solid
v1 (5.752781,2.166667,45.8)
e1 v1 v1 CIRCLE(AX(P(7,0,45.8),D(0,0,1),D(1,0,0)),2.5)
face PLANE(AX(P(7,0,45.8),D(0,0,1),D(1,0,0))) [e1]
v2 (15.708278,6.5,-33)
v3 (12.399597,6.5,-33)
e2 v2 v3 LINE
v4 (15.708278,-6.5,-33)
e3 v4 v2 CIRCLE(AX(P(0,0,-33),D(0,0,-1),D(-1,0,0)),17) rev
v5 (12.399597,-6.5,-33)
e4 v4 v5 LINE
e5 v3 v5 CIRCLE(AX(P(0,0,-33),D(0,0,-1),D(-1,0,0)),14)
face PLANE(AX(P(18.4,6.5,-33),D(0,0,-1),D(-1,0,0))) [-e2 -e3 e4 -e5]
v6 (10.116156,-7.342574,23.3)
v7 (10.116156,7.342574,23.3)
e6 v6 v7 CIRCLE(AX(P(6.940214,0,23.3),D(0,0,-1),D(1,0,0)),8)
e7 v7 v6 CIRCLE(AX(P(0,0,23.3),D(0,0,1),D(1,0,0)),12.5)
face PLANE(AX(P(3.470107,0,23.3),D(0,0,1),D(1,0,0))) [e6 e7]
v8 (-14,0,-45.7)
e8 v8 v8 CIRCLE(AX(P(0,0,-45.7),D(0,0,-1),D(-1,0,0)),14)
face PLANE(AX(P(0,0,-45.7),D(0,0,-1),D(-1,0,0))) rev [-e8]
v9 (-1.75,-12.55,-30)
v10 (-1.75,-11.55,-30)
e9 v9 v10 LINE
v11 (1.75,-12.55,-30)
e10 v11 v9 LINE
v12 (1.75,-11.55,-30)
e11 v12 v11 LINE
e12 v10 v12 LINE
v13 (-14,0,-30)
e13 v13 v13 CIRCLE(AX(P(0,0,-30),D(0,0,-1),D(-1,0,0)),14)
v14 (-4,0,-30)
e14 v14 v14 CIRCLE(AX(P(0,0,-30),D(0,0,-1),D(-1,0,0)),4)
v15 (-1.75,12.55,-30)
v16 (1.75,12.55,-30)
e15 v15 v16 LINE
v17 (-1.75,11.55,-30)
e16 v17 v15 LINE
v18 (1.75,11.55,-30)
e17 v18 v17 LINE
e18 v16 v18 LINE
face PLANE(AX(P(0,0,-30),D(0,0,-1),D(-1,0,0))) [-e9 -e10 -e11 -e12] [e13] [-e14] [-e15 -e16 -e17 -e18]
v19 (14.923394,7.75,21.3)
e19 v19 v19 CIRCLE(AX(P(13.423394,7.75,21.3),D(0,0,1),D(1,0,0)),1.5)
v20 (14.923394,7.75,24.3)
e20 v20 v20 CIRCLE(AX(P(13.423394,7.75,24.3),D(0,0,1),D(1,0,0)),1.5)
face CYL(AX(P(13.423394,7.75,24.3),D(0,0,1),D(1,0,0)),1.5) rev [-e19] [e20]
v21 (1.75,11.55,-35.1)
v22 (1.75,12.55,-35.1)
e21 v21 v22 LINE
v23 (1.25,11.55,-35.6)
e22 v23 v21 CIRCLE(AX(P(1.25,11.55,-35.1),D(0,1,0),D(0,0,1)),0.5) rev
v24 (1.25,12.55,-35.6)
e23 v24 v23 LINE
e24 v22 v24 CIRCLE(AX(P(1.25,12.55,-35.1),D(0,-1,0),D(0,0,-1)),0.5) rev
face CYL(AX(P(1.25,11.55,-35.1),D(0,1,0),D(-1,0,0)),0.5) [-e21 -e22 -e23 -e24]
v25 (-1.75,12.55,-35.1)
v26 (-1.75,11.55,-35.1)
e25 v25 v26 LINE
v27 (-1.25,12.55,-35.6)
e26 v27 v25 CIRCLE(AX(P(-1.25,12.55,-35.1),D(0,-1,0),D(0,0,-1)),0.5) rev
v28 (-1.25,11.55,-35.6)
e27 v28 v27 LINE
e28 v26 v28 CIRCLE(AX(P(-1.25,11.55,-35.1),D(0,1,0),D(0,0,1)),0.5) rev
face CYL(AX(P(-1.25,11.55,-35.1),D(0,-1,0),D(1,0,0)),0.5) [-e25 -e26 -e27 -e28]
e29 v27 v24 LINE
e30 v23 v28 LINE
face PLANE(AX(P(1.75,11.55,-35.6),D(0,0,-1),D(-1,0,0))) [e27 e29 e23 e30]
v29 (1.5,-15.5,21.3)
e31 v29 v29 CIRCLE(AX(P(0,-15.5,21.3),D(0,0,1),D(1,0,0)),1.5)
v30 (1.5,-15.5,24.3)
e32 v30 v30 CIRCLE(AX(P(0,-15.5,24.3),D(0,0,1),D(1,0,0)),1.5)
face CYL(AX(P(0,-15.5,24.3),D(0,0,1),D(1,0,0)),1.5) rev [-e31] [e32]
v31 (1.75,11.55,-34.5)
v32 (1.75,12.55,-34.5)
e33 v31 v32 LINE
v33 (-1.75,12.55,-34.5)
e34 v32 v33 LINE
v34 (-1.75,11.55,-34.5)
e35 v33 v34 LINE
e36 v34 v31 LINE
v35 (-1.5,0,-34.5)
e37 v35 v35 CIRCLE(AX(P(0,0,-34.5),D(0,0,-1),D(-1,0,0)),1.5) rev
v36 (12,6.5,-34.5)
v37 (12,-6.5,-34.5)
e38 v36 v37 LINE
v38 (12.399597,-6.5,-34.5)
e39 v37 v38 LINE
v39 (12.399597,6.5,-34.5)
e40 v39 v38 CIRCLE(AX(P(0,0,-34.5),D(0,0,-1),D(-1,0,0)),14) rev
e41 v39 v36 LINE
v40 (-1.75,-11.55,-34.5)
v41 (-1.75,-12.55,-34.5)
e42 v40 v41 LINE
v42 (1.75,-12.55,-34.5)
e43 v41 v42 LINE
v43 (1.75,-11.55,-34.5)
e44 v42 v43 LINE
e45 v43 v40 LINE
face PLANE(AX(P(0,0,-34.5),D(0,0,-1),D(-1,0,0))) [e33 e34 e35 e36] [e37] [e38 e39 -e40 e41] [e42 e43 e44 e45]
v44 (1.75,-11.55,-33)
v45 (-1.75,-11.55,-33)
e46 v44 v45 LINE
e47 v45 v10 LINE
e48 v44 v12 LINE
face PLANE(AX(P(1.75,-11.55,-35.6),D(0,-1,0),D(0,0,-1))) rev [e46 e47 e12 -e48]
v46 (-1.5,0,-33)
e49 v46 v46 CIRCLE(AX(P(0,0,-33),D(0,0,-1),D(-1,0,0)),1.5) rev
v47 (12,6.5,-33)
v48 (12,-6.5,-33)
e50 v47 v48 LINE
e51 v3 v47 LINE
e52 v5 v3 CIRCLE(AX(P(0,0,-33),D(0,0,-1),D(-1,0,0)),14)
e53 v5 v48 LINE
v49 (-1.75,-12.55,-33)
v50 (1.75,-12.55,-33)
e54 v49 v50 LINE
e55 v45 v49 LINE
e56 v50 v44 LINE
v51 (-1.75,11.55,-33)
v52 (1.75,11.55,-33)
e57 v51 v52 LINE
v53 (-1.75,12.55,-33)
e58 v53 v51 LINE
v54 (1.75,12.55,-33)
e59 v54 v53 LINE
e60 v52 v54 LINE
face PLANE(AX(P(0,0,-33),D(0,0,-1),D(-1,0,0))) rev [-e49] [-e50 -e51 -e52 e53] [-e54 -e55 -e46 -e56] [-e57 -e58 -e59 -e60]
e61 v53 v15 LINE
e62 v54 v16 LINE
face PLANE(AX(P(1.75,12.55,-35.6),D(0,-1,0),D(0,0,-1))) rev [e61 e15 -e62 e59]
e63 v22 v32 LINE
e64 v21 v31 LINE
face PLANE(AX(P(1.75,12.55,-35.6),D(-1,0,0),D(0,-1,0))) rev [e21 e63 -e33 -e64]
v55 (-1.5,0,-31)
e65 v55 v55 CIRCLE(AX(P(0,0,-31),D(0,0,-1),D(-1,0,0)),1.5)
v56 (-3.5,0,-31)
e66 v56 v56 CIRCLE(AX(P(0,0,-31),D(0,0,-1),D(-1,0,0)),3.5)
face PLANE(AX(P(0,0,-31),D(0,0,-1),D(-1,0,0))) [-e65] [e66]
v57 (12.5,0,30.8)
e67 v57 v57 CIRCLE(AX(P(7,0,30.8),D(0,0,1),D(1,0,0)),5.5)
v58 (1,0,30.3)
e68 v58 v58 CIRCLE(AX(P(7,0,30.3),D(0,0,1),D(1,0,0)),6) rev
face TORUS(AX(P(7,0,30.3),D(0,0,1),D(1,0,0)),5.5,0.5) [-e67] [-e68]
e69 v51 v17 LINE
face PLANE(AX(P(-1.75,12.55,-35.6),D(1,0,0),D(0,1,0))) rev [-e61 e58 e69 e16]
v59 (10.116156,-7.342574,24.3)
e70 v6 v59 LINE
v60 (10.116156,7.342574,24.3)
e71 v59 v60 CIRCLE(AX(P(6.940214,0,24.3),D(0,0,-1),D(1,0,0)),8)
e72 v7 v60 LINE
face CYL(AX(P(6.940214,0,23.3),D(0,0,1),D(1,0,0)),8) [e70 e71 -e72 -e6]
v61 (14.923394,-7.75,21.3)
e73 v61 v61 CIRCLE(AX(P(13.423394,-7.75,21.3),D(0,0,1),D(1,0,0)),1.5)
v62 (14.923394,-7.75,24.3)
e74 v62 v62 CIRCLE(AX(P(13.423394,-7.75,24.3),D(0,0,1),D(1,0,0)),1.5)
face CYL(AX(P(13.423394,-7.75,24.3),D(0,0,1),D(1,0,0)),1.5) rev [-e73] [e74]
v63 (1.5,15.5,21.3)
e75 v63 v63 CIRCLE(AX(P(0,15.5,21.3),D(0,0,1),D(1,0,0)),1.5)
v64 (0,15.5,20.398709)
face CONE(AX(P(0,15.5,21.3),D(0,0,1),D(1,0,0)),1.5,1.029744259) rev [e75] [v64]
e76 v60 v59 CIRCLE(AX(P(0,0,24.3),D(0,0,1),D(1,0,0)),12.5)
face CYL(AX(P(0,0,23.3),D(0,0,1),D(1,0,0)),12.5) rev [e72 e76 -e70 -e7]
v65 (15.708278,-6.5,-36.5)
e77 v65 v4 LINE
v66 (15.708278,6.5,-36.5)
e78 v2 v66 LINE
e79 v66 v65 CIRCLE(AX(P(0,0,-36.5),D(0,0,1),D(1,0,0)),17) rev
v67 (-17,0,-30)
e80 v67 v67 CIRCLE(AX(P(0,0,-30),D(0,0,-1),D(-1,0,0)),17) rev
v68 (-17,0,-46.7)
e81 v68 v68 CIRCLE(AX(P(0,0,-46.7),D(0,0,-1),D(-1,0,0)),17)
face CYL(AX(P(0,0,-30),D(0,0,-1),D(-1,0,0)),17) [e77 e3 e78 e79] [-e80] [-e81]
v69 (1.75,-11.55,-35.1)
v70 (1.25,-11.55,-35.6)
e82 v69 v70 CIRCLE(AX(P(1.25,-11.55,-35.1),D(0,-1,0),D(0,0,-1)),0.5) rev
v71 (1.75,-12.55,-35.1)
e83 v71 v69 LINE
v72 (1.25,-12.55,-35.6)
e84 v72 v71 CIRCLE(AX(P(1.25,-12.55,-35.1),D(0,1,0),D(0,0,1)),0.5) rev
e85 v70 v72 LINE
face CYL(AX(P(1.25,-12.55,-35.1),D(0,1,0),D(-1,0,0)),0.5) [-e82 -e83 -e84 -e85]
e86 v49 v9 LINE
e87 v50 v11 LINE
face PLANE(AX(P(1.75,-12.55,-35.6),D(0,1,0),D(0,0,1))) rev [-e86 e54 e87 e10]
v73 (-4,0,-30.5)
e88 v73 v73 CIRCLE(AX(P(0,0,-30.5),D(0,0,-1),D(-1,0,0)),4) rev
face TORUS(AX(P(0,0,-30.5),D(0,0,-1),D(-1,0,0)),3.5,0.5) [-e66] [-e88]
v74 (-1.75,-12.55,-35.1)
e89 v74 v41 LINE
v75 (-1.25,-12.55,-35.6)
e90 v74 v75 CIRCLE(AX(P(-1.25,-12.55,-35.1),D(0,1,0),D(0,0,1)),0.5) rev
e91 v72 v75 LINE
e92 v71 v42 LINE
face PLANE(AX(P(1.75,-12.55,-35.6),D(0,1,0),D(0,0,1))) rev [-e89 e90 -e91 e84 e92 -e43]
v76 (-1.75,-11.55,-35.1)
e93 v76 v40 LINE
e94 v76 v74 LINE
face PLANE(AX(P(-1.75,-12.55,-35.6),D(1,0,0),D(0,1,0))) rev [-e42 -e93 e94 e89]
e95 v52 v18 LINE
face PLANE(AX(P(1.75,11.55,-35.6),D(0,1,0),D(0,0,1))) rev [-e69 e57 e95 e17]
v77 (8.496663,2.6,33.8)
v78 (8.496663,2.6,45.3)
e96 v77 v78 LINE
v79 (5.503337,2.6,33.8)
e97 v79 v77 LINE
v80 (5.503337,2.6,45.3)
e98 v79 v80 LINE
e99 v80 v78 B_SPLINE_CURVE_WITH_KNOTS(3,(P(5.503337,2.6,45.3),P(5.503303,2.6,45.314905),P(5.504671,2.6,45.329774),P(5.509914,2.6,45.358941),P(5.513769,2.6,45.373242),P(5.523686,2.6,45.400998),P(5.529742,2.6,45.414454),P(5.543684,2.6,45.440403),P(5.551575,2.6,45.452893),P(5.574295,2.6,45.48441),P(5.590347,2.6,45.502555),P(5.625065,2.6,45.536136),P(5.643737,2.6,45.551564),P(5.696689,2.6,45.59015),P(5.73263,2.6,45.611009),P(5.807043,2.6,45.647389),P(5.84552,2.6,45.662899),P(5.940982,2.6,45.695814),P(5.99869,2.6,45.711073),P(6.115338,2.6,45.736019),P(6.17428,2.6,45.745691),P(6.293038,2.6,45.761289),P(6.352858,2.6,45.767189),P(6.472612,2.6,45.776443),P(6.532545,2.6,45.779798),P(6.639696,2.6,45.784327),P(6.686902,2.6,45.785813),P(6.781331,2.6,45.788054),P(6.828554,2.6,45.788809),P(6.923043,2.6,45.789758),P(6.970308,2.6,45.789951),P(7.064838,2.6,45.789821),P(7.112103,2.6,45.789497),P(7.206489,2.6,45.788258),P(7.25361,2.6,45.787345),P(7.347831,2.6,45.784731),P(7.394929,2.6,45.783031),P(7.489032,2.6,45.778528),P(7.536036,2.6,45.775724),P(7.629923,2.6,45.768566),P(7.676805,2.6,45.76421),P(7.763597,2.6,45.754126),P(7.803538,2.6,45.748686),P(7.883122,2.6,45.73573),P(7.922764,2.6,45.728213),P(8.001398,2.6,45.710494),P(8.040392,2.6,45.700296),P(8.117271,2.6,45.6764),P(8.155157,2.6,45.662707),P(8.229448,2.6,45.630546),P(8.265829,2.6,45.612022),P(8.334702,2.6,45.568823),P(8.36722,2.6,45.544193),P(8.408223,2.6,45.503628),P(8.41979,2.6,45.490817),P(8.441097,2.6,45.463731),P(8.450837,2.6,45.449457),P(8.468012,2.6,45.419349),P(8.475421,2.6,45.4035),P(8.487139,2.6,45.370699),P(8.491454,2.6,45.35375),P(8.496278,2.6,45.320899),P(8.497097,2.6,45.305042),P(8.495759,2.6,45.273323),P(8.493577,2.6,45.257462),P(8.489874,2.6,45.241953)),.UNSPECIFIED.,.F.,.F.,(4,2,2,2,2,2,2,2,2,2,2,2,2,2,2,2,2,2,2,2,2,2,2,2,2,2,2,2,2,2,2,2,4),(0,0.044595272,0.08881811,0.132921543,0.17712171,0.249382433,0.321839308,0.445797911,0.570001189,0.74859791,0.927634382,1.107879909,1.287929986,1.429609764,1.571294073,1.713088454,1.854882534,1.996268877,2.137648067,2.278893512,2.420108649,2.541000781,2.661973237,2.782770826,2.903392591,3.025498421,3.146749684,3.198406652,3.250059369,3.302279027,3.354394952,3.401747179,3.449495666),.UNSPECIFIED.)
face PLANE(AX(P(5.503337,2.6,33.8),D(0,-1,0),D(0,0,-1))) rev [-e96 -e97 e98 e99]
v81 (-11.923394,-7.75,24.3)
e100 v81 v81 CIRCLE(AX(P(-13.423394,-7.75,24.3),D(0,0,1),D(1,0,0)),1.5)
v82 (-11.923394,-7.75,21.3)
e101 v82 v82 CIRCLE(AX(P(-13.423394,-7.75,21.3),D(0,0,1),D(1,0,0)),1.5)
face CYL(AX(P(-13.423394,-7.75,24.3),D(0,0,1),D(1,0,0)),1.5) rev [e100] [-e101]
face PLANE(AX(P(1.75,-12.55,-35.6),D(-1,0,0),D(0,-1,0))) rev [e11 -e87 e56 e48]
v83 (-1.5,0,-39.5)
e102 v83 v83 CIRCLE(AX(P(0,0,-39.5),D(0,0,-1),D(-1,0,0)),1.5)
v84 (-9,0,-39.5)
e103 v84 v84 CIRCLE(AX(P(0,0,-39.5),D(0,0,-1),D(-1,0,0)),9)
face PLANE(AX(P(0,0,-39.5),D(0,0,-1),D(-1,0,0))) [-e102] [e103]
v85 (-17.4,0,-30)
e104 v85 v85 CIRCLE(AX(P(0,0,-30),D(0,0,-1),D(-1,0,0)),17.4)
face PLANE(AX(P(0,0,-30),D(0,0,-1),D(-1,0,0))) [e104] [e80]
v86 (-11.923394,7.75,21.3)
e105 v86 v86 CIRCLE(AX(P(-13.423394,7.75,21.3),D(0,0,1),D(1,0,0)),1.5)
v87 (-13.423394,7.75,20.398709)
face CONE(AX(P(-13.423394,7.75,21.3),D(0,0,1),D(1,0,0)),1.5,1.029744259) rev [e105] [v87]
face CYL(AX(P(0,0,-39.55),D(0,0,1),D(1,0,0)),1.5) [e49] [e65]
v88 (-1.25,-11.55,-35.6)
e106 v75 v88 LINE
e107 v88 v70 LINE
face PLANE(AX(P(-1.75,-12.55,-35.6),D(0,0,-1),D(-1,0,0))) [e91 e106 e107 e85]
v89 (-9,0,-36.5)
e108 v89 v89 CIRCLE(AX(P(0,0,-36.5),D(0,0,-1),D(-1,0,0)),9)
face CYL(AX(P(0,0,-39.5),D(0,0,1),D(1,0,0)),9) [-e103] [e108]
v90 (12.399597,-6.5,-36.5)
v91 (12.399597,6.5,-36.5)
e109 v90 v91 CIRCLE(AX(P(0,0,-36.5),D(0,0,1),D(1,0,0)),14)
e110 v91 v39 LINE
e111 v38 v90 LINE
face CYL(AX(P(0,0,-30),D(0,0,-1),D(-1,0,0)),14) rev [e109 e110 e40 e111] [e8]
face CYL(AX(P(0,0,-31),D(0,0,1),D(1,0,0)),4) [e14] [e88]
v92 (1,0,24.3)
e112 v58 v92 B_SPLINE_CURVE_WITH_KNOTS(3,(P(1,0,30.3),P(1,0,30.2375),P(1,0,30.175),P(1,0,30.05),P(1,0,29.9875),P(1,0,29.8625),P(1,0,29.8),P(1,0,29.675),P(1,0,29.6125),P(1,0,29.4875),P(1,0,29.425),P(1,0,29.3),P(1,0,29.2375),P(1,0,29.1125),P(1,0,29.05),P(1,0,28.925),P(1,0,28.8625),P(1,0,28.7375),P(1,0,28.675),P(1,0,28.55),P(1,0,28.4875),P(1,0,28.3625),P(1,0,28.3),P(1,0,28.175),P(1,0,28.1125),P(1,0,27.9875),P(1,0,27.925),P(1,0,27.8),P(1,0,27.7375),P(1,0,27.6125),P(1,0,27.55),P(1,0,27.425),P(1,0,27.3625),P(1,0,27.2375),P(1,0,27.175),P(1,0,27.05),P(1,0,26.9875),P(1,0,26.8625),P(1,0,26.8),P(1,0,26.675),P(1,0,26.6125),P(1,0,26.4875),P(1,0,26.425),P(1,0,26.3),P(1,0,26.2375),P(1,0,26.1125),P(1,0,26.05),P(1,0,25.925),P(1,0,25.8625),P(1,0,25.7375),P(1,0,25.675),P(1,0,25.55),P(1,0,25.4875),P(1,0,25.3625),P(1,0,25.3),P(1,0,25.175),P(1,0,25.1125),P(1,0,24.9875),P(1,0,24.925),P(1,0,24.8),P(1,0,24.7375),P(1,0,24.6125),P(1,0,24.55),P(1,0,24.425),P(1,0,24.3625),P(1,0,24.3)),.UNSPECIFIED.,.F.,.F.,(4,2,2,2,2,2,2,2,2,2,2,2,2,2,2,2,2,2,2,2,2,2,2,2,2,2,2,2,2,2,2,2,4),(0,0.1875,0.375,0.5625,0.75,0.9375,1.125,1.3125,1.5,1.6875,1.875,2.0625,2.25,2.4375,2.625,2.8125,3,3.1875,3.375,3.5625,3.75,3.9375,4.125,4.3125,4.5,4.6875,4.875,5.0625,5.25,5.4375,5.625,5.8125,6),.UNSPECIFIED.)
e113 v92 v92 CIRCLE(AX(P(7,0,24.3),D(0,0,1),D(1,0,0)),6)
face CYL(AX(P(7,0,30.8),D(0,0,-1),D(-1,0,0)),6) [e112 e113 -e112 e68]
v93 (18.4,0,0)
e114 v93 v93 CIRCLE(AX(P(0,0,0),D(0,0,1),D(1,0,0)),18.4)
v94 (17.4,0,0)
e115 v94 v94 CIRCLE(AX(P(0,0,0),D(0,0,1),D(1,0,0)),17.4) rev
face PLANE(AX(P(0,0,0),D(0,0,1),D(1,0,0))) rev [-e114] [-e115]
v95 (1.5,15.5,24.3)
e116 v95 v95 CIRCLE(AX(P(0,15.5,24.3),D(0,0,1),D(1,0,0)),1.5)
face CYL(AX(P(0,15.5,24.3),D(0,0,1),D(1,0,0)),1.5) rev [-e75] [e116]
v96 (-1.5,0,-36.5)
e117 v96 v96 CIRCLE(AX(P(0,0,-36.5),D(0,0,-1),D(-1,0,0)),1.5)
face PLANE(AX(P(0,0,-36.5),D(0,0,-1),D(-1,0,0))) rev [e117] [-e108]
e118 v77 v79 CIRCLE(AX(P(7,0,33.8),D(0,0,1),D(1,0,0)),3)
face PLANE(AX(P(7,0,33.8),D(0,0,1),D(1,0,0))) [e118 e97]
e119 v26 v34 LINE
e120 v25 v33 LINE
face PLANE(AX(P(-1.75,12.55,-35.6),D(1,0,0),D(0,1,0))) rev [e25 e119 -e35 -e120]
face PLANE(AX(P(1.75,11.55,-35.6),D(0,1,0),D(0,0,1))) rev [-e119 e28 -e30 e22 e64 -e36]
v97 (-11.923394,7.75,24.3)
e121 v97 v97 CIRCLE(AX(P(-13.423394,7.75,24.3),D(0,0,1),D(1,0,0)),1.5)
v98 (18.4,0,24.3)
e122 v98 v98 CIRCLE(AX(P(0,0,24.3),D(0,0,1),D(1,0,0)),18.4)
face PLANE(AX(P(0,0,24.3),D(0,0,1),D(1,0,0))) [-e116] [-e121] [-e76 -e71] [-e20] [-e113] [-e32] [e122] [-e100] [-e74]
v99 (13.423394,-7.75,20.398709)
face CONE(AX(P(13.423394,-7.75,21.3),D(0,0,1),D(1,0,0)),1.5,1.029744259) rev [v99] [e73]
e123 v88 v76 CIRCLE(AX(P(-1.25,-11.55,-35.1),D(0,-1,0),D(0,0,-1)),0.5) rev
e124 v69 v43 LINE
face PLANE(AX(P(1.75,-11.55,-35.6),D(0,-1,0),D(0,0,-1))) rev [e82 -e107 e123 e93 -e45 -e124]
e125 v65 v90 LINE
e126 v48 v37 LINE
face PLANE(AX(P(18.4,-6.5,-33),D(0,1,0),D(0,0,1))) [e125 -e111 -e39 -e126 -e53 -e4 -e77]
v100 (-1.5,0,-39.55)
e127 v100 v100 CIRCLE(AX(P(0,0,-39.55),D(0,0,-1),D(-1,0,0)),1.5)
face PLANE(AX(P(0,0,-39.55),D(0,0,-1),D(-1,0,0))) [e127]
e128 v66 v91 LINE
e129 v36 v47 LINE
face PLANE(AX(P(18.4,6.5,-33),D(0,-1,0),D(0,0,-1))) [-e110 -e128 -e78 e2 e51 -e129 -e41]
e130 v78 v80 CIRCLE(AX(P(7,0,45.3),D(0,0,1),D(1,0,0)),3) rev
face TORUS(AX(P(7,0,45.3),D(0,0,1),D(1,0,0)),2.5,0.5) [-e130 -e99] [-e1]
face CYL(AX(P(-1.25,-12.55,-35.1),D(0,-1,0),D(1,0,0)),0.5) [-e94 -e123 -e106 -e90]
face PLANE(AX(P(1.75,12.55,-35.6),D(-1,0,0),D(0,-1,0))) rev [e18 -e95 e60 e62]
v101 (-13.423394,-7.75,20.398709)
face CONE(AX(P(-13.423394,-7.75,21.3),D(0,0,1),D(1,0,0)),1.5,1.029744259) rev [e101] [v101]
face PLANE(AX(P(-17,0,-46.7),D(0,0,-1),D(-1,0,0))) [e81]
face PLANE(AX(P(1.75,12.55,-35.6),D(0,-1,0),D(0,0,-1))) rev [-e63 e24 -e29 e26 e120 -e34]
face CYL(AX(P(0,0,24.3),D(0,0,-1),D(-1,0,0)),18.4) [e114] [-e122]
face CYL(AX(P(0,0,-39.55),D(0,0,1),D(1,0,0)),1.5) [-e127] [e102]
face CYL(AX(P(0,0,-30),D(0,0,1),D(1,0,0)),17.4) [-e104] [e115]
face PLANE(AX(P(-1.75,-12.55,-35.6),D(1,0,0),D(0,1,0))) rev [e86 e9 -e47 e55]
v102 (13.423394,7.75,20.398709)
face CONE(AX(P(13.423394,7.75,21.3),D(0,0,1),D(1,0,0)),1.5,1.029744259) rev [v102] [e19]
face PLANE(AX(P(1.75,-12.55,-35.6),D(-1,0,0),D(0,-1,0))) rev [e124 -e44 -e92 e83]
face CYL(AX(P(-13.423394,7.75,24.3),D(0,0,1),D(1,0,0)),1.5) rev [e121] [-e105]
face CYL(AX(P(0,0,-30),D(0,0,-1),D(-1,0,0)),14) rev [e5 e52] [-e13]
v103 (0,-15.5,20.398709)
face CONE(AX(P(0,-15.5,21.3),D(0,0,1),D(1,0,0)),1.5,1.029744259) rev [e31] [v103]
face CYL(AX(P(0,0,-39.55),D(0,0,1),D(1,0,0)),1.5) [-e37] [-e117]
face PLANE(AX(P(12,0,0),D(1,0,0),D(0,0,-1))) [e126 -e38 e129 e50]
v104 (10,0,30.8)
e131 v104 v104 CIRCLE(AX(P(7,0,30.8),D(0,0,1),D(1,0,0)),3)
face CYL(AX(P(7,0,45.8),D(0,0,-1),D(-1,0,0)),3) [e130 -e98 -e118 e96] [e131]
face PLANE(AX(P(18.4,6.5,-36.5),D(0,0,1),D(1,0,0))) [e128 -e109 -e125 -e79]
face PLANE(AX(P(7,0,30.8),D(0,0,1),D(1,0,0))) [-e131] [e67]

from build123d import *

# Parameters (mm, degrees)
SKETCH1_R                    = 18.4
BOSS_EXTRUDE1_DEPTH          = 24.3
SKETCH2_R                    = 17.4
BOSS_EXTRUDE2_DEPTH          = 30
SKETCH3_R                    = 6
BOSS_EXTRUDE3_DEPTH          = 6.5
FILLET1_R                    = 0.5
SKETCH4_R                    = 3
BOSS_EXTRUDE4_DEPTH          = 15
CUT_EXTRUDE1_START           = -12
CUT_EXTRUDE1_DEPTH           = 12
F_3_0_3_DIAMETER_HOLE1_D     = 3
F_3_0_3_DIAMETER_HOLE1_DEPTH = 3
F_3_0_3_DIAMETER_HOLE1_TIP   = 0.901290929
CUT_EXTRUDE2_DEPTH           = 1
SKETCH9_R                    = 4
BOSS_EXTRUDE5_DEPTH          = 1
FILLET2_R                    = 0.5
SKETCH10_R                   = 14
BOSS_EXTRUDE6_DEPTH          = 1.5
SKETCH11_W                   = 3.5
SKETCH11_H                   = 1
BOSS_EXTRUDE7_DEPTH          = 5.6
FILLET3_R                    = 0.5
SKETCH13_R                   = 9
BOSS_EXTRUDE8_DEPTH          = 3
SKETCH14_R                   = 1.5
BOSS_EXTRUDE9_DEPTH          = 8.55
FILLET4_R                    = 0.5
SKETCH15_W                   = 3
SKETCH15_H                   = 16.7
SKETCH16_R                   = 14
BOSS_EXTRUDE10_DEPTH         = 1
CUT_EXTRUDE3_START           = 12
SKETCH17_W                   = 3.5
SKETCH17_H                   = 13
CUT_EXTRUDE3_DEPTH           = 42.460359146


with BuildPart() as part:
    # Sketch1 → Boss-Extrude1 (new body)
    with BuildSketch(Plane.XY):
        Circle(SKETCH1_R)
    extrude(amount=BOSS_EXTRUDE1_DEPTH)

    # Sketch2 → Boss-Extrude2 (add)
    with BuildSketch(Plane(origin=(0, 0, 0), x_dir=(-1, 0, 0), z_dir=(0, 0, -1))):
        with Locations(Location((0, 0, 0), (0, 0, 180))):
            Circle(SKETCH2_R)
    extrude(amount=BOSS_EXTRUDE2_DEPTH)

    # Sketch3 → Boss-Extrude3 (add)
    with BuildSketch(Plane.XY.offset(24.3)):
        with Locations(Location((7, 0, 0), (0, 0, 180))):
            Circle(SKETCH3_R)
    extrude(amount=BOSS_EXTRUDE3_DEPTH)

    # Fillet1
    fillet1_edges = [part.edges().sort_by_distance(p)[0] for p in [
        (13, 0, 30.8),
    ]]
    fillet(fillet1_edges, radius=FILLET1_R)

    # Sketch4 → Boss-Extrude4 (add)
    with BuildSketch(Plane.XY.offset(30.8)):
        with Locations((7, 0)):
            Circle(SKETCH4_R)
    extrude(amount=BOSS_EXTRUDE4_DEPTH)

    # Sketch5 → Cut-Extrude1 (cut)
    with BuildSketch(Plane.XY.offset(45.8).offset(CUT_EXTRUDE1_START)):
        with BuildLine():
            Line((5.503337045, 2.6), (8.496662955, 2.6))
            ThreePointArc((8.496662955, 2.6), (7, 3), (5.503337045, 2.6))
        make_face()
    extrude(amount=CUT_EXTRUDE1_DEPTH, mode=Mode.SUBTRACT)

    # Ø3.0 (3) Diameter Hole1
    with Locations(Plane.XY.offset(24.3)):
        with Locations((-13.423393759, 7.75), (-13.423393759, -7.75), (0, -15.5), (13.423393759, 7.75), (0, 15.5), (13.423393759, -7.75)):
            Hole(F_3_0_3_DIAMETER_HOLE1_D / 2, depth=F_3_0_3_DIAMETER_HOLE1_DEPTH)
            with Locations((0, 0, -(F_3_0_3_DIAMETER_HOLE1_DEPTH + F_3_0_3_DIAMETER_HOLE1_TIP / 2))):  # 118° drill point
                Cone(0, F_3_0_3_DIAMETER_HOLE1_D / 2, F_3_0_3_DIAMETER_HOLE1_TIP, mode=Mode.SUBTRACT)

    # Sketch8 → Cut-Extrude2 (cut)
    with BuildSketch(Plane.XY.offset(24.3)):
        with BuildLine():
            ThreePointArc((10.116155685, 7.342574083), (-12.5, 0), (10.116155685, -7.342574083))
            ThreePointArc((10.116155685, -7.342574083), (-1.05978604, 0), (10.116155685, 7.342574083))
        make_face()
    extrude(amount=-CUT_EXTRUDE2_DEPTH, mode=Mode.SUBTRACT)

    # Sketch9 → Boss-Extrude5 (add)
    with BuildSketch(Plane(origin=(0, 0, -30), x_dir=(-1, 0, 0), z_dir=(0, 0, -1))):
        Circle(SKETCH9_R)
    extrude(amount=BOSS_EXTRUDE5_DEPTH)

    # Fillet2
    fillet2_edges = [part.edges().sort_by_distance(p)[0] for p in [
        (4, 0, -31),
    ]]
    fillet(fillet2_edges, radius=FILLET2_R)

    # Sketch11 → Boss-Extrude7 (add)
    with BuildSketch(Plane(origin=(0, 0, -30), x_dir=(-1, 0, 0), z_dir=(0, 0, -1))):
        with Locations((0, 12.05)):
            Rectangle(SKETCH11_W, SKETCH11_H)
        with Locations((0, -12.05)):
            Rectangle(SKETCH11_W, SKETCH11_H)
    extrude(amount=BOSS_EXTRUDE7_DEPTH)

    # Fillet3
    fillet3_edges = [part.edges().sort_by_distance(p)[0] for p in [
        (1.75, 12.05, -35.6),
        (-1.75, 12.05, -35.6),
        (-1.75, -12.05, -35.6),
        (1.75, -12.05, -35.6),
    ]]
    fillet(fillet3_edges, radius=FILLET3_R)

    # Sketch14 → Boss-Extrude9 (add)
    with BuildSketch(Plane(origin=(0, 0, -31), x_dir=(-1, 0, 0), z_dir=(0, 0, -1))):
        Circle(SKETCH14_R)
    extrude(amount=BOSS_EXTRUDE9_DEPTH)

    # Fillet4
    # the kernel refuses this fillet: 0.5 mm, written as the material it takes off along each edge
    with BuildSketch(Plane(origin=(7, 0, 45.8), x_dir=(0.4622655728594592, 0.8867415295050277, 0), z_dir=(0.8867415295050277, -0.4622655728594592, 0))) as fillet4_piece_1:
        with BuildLine():
            CenterArc((3 - FILLET4_R, -FILLET4_R), FILLET4_R, 0, 90)
            Line((3 - FILLET4_R, 0), (3 - FILLET4_R, FILLET4_R * 0.02))
            Line((3 - FILLET4_R, FILLET4_R * 0.02), (3 + FILLET4_R * 0.02, FILLET4_R * 0.02))
            Line((3 + FILLET4_R * 0.02, FILLET4_R * 0.02), (3 + FILLET4_R * 0.02, -FILLET4_R))
            Line((3 + FILLET4_R * 0.02, -FILLET4_R), (3, -FILLET4_R))
        make_face()
    revolve(axis=Axis((7, 0, 45.8), (0, 0, 1)), revolution_arc=297.533397677, mode=Mode.SUBTRACT)
    with BuildSketch(Plane(origin=(7, 0, 45.8), x_dir=(1, 0, 0), z_dir=(0, -1, 0))) as fillet4_piece_2:
        with BuildLine():
            CenterArc((3 - FILLET4_R, -FILLET4_R), FILLET4_R, 0, 90)
            Line((3 - FILLET4_R, 0), (3 - FILLET4_R, FILLET4_R * 0.02))
            Line((3 - FILLET4_R, FILLET4_R * 0.02), (3 + FILLET4_R * 0.02, FILLET4_R * 0.02))
            Line((3 + FILLET4_R * 0.02, FILLET4_R * 0.02), (3 + FILLET4_R * 0.02, -FILLET4_R))
            Line((3 + FILLET4_R * 0.02, -FILLET4_R), (3, -FILLET4_R))
        make_face()
    revolve(axis=Axis((7, 0, 45.8), (0, 0, 1)), revolution_arc=117.379597562, mode=Mode.SUBTRACT)


with BuildPart() as body_2:
    # Sketch10 → Boss-Extrude6 (new body)
    with BuildSketch(Plane(origin=(0, 0, -33), x_dir=(-1, 0, 0), z_dir=(0, 0, -1))):
        Circle(SKETCH10_R)
    extrude(amount=BOSS_EXTRUDE6_DEPTH)


    add(part.part)  # Revolve1 merges part


with BuildPart() as body_3:
    # Sketch13 → Boss-Extrude8 (new body)
    with BuildSketch(Plane(origin=(0, 0, -36.5), x_dir=(-1, 0, 0), z_dir=(0, 0, -1))):
        Circle(SKETCH13_R)
    extrude(amount=BOSS_EXTRUDE8_DEPTH)


with BuildPart() as body_2_1:
    add(body_2.part)

    add(body_3.part)  # Revolve1 merges body 3
    # Sketch15 → Revolve1 (revolve)
    with BuildSketch(Plane(origin=(0, 0, 0), x_dir=(1, 0, 0), z_dir=(0, 1, 0))):
        with Locations((-15.5, 38.35)):
            Rectangle(SKETCH15_W, SKETCH15_H)
    revolve(axis=Axis((0, 0, -30), (0, 0, 1)))

    # Sketch16 → Boss-Extrude10 (add)
    with BuildSketch(Plane(origin=(0, 0, -46.7), x_dir=(-1, 0, 0), z_dir=(0, 0, -1))):
        Circle(SKETCH16_R)
    extrude(amount=-BOSS_EXTRUDE10_DEPTH)

    # Sketch17 → Cut-Extrude3 (cut, through all)
    with BuildSketch(Plane(origin=(0, 0, 0), x_dir=(0, 0, -1), z_dir=(1, 0, 0)).offset(CUT_EXTRUDE3_START)):
        with Locations((34.75, 0)):
            Rectangle(SKETCH17_W, SKETCH17_H)
    extrude(amount=CUT_EXTRUDE3_DEPTH, mode=Mode.SUBTRACT)


solid = body_2_1.part
